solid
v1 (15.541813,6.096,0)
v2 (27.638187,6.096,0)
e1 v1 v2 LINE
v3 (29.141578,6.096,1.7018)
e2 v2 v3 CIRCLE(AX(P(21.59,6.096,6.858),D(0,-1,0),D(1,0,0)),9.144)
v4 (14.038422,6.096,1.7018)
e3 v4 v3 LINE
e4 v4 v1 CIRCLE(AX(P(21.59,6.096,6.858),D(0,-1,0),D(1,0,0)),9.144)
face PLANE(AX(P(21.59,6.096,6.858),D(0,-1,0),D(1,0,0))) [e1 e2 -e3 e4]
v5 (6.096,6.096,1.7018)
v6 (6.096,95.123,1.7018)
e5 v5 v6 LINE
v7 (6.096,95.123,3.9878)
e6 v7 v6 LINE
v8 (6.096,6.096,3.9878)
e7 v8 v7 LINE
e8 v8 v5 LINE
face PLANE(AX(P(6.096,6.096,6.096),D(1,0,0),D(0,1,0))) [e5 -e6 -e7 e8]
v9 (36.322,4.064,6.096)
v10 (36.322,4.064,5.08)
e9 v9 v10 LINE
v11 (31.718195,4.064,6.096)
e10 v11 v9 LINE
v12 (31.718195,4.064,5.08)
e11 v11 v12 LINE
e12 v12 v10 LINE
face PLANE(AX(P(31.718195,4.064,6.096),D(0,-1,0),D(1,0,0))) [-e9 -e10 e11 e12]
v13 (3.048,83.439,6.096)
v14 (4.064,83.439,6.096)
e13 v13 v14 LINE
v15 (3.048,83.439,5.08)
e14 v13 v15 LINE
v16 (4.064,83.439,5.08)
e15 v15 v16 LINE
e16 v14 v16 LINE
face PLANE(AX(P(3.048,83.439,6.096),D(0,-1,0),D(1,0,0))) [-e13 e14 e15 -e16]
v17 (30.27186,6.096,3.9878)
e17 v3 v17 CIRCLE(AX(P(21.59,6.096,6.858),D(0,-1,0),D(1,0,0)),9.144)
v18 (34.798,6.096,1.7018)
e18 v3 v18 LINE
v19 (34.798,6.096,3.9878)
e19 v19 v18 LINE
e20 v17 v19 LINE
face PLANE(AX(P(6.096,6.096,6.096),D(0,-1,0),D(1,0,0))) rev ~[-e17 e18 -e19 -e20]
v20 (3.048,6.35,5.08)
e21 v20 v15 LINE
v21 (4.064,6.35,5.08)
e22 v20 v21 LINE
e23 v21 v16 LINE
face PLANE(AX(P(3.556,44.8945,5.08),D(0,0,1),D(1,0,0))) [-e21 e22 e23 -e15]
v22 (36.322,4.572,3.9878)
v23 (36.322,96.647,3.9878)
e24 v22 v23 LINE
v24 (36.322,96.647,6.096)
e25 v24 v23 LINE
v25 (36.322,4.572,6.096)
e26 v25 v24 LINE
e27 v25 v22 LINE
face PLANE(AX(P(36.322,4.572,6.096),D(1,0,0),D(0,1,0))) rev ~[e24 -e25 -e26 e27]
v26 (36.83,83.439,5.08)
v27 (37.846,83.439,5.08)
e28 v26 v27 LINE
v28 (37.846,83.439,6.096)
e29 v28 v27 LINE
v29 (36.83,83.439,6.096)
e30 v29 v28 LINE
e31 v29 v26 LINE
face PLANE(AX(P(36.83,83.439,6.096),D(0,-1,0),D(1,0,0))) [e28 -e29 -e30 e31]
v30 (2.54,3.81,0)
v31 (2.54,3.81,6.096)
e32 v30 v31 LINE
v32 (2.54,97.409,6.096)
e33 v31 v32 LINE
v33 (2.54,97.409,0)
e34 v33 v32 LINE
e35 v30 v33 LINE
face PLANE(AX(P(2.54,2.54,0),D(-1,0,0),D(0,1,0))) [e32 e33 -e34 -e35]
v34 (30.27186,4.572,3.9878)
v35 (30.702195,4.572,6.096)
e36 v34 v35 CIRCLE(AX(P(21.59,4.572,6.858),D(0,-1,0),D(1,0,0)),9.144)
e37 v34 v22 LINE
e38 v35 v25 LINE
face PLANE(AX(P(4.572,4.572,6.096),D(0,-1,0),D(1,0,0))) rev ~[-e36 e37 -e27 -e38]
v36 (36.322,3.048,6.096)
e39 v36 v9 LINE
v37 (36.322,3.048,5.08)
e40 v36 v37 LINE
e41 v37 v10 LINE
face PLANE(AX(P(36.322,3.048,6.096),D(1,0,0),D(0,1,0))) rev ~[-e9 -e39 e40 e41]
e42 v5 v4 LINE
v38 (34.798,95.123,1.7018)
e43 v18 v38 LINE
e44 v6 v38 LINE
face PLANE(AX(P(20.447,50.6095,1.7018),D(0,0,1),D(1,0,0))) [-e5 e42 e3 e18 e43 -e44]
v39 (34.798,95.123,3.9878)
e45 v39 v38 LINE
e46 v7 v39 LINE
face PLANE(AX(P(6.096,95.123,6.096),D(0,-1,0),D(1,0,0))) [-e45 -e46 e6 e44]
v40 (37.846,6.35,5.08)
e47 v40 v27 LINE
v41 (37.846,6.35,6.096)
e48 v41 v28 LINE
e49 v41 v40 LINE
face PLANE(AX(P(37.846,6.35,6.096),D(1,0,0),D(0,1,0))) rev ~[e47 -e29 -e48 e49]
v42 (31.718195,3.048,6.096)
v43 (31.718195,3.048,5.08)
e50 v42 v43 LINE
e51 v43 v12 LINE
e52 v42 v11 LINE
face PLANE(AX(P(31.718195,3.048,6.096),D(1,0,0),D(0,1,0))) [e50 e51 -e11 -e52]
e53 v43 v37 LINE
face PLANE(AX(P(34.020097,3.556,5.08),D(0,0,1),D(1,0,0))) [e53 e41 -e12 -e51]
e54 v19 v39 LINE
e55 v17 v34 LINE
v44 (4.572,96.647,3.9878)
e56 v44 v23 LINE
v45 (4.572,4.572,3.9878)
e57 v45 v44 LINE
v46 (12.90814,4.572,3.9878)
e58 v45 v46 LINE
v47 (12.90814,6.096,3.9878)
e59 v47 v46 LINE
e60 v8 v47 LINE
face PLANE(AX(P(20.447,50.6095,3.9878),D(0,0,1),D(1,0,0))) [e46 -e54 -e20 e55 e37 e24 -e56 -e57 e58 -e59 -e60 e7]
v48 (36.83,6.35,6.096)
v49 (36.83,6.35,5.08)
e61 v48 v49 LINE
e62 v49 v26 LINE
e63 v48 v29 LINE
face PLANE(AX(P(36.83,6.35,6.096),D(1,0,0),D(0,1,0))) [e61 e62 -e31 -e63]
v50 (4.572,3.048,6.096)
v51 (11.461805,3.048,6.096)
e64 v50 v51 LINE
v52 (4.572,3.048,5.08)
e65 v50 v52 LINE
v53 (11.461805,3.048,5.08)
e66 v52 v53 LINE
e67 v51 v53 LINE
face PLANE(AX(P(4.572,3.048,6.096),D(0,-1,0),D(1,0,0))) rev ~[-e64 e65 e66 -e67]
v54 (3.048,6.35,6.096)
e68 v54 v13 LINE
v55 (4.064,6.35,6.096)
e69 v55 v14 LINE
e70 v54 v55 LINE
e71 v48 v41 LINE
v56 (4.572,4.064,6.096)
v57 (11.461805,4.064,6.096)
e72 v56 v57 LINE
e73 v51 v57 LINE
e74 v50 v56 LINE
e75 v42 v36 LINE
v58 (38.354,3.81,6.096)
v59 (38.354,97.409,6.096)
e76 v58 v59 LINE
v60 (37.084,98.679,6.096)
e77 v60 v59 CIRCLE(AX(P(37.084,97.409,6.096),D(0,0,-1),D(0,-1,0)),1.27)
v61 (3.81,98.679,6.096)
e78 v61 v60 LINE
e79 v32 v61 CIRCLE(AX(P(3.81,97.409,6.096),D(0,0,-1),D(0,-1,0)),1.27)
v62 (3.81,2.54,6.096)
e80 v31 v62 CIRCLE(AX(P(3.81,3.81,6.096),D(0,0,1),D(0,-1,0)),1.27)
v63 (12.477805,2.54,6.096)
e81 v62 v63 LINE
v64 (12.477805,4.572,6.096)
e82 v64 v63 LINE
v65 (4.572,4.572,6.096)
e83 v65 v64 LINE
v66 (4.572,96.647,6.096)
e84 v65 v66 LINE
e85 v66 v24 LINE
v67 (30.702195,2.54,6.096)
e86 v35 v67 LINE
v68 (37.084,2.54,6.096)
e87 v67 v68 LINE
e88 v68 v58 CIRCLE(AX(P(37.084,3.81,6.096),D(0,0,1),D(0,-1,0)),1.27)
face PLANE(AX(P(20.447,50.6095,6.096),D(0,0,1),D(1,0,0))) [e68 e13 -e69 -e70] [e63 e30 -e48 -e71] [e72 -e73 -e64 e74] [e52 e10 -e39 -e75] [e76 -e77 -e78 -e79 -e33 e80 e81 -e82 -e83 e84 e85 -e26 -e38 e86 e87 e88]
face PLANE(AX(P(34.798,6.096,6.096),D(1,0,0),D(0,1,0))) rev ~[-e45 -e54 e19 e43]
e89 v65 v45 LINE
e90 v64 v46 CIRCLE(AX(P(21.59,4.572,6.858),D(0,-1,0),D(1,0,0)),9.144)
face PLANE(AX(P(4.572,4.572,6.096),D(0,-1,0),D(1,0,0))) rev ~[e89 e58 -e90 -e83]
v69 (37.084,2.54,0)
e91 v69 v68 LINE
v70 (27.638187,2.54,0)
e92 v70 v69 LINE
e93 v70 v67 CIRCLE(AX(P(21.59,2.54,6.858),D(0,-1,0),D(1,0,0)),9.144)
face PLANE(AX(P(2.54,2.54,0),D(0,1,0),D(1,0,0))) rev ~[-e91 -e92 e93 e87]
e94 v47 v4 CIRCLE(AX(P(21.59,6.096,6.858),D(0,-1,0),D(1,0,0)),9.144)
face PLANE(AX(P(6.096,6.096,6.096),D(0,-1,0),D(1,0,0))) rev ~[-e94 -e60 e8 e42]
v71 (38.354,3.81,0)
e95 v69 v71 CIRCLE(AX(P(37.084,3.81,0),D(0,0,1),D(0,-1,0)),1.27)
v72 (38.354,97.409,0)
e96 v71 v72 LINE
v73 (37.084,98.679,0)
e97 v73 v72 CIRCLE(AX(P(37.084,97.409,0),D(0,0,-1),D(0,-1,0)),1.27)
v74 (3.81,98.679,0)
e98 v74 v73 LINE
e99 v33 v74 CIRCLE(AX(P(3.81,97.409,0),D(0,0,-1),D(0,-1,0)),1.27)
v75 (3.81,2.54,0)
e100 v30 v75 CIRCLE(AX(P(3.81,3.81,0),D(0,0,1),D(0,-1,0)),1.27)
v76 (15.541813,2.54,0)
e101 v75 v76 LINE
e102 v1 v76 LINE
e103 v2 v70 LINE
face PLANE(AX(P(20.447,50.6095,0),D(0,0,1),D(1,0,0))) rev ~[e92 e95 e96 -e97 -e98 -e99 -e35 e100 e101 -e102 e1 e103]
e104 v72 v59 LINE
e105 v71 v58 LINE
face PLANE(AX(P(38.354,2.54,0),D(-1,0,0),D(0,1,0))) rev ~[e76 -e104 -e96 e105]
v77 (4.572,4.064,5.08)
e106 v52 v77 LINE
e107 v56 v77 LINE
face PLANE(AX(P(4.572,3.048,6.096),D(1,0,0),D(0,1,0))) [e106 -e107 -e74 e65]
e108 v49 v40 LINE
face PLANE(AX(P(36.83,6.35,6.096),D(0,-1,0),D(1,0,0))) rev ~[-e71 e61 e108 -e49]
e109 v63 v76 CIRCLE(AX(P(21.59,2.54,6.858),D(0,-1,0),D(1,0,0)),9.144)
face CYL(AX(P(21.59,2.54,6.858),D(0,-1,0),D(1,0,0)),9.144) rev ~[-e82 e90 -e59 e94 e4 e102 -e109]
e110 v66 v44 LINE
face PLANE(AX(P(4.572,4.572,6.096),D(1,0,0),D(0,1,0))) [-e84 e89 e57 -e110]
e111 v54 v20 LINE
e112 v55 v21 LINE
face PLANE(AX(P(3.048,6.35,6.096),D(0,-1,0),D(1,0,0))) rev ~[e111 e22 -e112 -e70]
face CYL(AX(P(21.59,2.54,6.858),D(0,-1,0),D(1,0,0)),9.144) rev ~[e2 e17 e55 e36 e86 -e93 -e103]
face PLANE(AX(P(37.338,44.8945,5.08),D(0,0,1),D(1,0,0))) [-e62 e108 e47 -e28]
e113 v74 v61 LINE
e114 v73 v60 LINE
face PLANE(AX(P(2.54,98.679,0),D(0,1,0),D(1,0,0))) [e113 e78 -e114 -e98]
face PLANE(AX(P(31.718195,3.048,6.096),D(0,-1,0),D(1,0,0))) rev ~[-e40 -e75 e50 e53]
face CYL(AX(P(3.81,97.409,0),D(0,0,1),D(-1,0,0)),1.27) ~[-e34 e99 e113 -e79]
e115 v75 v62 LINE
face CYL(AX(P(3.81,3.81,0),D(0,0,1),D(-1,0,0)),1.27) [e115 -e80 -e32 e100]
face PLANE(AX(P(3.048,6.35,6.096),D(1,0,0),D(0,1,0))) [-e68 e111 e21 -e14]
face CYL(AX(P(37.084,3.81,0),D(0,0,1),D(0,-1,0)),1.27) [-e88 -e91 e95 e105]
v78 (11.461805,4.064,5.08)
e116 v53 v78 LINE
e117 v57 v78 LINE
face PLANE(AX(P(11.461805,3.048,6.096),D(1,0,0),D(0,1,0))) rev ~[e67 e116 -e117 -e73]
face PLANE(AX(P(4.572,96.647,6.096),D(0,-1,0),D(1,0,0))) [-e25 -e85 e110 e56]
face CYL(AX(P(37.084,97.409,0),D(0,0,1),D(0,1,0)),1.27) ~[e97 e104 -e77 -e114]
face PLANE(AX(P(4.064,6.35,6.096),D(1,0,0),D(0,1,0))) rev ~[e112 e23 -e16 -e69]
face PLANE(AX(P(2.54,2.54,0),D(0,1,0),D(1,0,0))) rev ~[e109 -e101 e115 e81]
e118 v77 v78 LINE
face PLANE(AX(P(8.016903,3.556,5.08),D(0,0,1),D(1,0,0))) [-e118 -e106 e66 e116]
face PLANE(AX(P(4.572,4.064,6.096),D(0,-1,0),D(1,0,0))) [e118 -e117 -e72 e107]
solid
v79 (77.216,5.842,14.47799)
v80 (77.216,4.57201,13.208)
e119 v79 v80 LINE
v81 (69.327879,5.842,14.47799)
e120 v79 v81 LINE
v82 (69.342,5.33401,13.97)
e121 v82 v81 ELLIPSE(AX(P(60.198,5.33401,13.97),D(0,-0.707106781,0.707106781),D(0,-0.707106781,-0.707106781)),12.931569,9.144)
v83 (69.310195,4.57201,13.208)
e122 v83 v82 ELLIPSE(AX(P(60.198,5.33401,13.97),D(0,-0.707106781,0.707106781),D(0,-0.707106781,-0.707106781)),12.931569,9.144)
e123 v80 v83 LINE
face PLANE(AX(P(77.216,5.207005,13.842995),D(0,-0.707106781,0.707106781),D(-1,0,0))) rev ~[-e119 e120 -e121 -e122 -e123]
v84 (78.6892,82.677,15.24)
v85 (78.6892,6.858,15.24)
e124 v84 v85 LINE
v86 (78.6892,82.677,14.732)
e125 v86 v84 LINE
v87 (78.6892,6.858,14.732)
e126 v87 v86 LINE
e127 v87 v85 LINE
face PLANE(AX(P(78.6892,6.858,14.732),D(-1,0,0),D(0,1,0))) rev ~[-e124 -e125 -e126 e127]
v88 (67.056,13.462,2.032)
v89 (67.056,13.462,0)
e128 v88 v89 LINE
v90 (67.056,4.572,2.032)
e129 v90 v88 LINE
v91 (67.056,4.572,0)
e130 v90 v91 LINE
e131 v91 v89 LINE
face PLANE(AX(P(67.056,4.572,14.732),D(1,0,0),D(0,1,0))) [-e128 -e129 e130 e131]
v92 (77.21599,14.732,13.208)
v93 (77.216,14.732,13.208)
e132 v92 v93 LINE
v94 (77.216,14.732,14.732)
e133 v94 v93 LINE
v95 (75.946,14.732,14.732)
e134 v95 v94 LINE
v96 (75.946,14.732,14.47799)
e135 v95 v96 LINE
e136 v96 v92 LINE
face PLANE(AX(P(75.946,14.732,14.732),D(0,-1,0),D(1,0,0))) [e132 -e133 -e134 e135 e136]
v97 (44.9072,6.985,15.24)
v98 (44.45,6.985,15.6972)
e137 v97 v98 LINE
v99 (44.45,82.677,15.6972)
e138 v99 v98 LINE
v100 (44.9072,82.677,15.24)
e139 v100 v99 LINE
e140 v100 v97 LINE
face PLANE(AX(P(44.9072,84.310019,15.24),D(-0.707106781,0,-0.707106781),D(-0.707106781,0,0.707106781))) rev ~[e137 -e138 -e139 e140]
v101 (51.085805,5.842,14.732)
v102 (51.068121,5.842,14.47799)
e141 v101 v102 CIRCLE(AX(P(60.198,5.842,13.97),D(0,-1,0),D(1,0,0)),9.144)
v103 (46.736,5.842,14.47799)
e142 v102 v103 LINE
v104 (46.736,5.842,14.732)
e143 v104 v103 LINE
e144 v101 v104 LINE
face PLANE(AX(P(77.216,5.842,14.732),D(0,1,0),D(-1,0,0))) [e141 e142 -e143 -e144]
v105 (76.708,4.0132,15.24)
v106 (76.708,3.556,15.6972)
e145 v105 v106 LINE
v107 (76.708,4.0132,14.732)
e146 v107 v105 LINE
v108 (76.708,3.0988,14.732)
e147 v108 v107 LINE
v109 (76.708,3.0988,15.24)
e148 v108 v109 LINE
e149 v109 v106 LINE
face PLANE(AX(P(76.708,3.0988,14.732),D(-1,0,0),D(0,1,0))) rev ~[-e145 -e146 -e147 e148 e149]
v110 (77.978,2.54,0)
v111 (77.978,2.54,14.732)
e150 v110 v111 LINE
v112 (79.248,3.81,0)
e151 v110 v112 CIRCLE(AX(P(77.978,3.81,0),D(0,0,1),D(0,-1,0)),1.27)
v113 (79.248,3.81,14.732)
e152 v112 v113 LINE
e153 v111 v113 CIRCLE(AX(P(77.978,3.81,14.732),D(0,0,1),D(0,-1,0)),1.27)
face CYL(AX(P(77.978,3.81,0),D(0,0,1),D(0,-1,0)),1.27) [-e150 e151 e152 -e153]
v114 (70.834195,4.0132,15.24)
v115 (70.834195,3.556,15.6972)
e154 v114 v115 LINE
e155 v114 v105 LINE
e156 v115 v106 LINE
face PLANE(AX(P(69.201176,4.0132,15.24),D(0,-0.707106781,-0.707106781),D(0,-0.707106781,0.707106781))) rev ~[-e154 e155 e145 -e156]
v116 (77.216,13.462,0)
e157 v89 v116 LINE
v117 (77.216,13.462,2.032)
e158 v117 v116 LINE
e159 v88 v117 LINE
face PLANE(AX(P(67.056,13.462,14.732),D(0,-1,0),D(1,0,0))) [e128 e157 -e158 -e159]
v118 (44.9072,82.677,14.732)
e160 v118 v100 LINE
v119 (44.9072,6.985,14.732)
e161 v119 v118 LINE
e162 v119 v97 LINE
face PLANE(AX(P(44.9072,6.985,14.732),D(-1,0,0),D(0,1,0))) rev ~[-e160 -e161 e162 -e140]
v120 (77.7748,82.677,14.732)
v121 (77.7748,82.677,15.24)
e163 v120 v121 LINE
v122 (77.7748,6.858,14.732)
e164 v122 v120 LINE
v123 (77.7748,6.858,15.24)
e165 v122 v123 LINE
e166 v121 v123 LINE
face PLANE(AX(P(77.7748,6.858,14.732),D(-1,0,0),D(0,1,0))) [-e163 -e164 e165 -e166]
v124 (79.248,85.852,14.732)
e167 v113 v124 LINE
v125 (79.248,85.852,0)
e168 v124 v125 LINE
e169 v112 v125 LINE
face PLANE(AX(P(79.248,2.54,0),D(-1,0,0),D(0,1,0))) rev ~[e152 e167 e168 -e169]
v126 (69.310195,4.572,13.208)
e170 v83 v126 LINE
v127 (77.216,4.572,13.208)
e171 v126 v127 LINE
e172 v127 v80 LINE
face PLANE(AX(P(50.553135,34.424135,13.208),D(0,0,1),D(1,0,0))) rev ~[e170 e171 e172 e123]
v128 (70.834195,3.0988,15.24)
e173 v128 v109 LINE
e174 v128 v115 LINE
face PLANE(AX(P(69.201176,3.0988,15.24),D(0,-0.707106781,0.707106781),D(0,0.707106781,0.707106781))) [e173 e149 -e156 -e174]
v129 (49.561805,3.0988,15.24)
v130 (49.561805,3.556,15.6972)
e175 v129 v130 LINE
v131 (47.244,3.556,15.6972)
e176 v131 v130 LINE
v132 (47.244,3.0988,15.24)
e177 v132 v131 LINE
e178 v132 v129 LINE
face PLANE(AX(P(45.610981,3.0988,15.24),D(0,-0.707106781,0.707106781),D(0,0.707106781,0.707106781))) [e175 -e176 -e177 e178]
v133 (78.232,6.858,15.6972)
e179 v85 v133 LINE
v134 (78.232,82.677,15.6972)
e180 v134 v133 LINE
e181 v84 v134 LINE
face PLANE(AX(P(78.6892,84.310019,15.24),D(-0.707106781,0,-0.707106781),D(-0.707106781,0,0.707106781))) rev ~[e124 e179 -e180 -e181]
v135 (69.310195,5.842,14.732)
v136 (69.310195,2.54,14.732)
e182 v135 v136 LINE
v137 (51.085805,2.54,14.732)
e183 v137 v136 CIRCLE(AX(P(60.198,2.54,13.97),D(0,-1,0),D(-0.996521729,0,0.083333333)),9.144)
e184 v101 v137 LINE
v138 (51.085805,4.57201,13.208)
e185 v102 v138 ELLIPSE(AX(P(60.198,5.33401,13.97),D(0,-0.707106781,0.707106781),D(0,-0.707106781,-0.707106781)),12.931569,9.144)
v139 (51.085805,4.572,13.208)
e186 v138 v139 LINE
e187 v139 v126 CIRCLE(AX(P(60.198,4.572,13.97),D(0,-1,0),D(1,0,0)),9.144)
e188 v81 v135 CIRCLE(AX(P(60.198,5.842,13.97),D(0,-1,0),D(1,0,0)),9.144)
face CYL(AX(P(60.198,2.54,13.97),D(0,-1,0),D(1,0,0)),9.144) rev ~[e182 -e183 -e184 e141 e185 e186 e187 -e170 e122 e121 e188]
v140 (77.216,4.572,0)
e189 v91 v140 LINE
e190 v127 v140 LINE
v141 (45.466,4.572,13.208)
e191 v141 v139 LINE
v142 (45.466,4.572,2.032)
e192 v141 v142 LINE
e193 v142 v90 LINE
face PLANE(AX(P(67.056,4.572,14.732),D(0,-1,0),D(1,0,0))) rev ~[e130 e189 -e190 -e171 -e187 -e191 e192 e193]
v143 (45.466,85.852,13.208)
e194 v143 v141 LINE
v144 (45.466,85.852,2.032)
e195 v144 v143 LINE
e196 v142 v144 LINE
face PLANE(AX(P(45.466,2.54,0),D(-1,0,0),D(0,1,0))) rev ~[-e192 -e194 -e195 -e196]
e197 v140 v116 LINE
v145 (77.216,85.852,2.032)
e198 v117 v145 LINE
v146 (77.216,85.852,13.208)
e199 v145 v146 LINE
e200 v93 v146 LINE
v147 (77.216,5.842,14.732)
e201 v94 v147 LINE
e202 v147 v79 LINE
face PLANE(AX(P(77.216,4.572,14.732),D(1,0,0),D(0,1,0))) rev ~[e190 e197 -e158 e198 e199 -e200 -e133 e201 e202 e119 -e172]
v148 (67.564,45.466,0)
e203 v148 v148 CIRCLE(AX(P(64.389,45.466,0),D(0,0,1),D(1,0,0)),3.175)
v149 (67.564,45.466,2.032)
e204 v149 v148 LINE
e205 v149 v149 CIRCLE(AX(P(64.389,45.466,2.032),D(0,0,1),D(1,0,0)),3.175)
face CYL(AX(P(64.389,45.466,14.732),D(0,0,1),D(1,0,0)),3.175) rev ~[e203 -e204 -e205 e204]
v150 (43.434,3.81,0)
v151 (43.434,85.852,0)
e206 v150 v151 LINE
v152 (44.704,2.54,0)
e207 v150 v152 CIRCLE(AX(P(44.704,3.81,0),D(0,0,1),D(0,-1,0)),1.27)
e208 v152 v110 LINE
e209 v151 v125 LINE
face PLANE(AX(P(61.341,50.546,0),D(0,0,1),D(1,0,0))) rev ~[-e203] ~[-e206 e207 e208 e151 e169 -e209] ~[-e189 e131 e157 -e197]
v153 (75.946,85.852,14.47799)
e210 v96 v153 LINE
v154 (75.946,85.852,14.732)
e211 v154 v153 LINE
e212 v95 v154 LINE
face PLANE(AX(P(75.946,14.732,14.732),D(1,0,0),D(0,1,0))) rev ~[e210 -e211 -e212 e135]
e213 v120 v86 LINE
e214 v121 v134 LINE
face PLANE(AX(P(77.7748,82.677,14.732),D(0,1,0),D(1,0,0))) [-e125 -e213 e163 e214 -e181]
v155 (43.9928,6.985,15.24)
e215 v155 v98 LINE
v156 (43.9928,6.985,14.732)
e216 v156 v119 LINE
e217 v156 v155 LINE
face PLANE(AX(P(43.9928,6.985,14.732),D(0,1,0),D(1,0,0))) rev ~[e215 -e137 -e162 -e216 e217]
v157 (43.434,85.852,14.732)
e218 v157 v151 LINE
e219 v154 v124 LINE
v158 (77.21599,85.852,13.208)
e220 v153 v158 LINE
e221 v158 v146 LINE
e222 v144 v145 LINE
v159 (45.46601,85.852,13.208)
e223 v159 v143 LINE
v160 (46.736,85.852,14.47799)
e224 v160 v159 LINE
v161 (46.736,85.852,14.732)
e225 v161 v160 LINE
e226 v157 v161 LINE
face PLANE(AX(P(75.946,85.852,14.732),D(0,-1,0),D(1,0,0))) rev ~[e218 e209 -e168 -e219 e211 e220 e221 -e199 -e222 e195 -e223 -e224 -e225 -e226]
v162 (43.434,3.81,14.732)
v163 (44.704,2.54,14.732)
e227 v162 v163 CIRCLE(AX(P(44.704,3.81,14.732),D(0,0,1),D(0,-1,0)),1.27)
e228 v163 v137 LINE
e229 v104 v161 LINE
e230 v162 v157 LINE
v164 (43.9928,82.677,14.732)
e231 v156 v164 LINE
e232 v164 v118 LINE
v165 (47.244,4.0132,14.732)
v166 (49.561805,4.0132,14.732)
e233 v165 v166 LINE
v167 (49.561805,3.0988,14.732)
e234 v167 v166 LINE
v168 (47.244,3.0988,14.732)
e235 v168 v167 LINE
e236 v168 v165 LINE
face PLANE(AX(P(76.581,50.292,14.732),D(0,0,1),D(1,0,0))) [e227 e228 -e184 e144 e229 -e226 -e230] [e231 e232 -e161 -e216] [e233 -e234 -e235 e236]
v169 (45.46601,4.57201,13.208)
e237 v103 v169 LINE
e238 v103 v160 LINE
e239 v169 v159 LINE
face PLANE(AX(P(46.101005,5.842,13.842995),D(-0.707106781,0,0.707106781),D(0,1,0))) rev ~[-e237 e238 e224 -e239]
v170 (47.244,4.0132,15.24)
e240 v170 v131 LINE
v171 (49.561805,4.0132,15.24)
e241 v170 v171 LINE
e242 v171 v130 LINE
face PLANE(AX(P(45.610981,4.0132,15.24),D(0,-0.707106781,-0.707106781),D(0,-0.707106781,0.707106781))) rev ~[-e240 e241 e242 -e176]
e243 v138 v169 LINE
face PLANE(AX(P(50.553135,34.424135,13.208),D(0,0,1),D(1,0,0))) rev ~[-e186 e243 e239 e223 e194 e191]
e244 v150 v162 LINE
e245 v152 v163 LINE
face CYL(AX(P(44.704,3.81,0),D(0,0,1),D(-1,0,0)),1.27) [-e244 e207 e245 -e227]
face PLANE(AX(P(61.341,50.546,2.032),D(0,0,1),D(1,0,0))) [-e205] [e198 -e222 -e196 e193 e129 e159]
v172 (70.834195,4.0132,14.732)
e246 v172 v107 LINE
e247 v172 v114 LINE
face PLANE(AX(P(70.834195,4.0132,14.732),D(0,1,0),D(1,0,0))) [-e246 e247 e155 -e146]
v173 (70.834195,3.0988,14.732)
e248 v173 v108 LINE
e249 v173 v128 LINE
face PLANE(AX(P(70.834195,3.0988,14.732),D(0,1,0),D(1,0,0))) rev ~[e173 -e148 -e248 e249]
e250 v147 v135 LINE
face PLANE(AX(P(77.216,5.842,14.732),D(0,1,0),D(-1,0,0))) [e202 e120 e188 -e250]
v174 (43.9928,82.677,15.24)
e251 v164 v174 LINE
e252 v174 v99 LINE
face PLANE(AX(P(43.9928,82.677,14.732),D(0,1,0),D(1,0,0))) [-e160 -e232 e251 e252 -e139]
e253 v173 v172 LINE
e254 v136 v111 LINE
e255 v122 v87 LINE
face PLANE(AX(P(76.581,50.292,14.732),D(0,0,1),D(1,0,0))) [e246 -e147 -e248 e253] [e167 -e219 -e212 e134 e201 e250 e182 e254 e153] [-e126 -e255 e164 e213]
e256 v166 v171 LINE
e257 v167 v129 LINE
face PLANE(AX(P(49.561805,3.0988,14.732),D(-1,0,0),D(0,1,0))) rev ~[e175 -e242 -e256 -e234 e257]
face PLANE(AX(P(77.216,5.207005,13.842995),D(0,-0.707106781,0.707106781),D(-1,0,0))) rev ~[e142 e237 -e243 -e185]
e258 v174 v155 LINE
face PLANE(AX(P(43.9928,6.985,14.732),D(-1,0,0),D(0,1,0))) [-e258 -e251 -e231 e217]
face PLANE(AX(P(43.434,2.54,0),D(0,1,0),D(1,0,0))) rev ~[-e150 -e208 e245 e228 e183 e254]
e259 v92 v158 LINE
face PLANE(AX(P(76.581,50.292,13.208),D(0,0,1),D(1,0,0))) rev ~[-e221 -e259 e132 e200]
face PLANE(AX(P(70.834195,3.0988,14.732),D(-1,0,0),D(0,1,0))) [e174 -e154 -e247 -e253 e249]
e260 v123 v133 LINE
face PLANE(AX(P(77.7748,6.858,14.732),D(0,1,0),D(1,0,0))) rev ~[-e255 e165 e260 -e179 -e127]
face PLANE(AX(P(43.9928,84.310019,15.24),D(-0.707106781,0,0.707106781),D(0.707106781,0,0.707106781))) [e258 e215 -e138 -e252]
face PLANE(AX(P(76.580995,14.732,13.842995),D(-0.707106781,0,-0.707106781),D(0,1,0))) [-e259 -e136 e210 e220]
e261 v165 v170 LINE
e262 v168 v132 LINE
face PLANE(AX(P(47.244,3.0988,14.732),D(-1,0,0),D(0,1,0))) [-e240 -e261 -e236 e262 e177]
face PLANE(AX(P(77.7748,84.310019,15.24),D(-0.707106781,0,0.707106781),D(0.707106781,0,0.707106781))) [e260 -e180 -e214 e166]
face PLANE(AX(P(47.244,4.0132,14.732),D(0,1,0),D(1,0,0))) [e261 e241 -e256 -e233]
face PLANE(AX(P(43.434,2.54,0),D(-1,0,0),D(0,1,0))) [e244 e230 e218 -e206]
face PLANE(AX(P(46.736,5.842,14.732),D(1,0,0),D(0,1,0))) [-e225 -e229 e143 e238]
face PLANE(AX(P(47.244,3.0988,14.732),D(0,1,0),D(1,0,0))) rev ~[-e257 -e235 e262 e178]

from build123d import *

# Parameters (mm, degrees)
F0_W         = 35.814
F0_H         = 96.139
F1_DEPTH     = 6.096
F2_W         = 28.702
F2_H         = 89.027
F3_DEPTH     = 4.3942
F4_W         = 31.75
F4_H         = 92.075
F4_W_2       = 28.702
F4_H_2       = 89.027
F5_DEPTH     = 2.1082
F6_W         = 35.814
F6_H         = 96.012
F7_DEPTH     = 14.732
F8_T         = -2.032
F9_W         = 35.814
F9_H         = 12.7
F9_W_2       = 10.16
F9_H_2       = 8.89
F9_R         = 3.175
F10_DEPTH    = 14.733
F11_W        = 1.27
F11_H        = 71.12
F12_DEPTH    = 1.524
F13_SIZE     = 1.26999
F14_R        = 1.27
F14_2_R      = 1.27
F15_R        = 9.144
F16_DEPTH    = 96.14
F17_DEPTH    = 3.556
F18_W        = 6.8898053138
F18_H        = 1.016
F18_W_2      = 1.016
F18_H_2      = 77.089
F18_W_3      = 4.6038053138
F19_DEPTH    = 1.016
F20_W        = 2.3178053138
F20_H        = 0.9144
F20_W_2      = 0.9144
F20_H_2      = 75.692
F20_W_3      = 5.8738053138
F20_H_3      = 75.819
F21_DEPTH    = 1.143
F22_T1_DEPTH = 5.5838427085
F22_T3_DEPTH = 78.9580373947
F22_T5_DEPTH = 9.1398427085
F22_T7_DEPTH = 79.0850373947


# Not quite as in the source:
# - a fillet or chamfer that OpenCascade refuses, or shapes differently, is made with other operations: its cross-section is extruded or revolved along the edge and cut away or added
# - a fillet or chamfer is up to 0.001 mm smaller than in the source, because OpenCascade refuses the exact size
# - a feature names something its author has since deleted; it is built from what else it names


with BuildPart() as f1:
    # F0 (on Top) → F1 (new body)
    with BuildSketch(Plane.XY):
        with Locations((20.447, 50.6095)):
            Rectangle(F0_W, F0_H)
    extrude(amount=F1_DEPTH)

    # F2 (on face) → F3 (cut)
    with BuildSketch(Plane.XY.offset(6.096)):
        with Locations((20.447, 50.6095)):
            Rectangle(F2_W, F2_H)
    extrude(amount=-F3_DEPTH, mode=Mode.SUBTRACT)

    # F4 (on face) → F5 (cut)
    with BuildSketch(Plane.XY.offset(6.096)):
        with Locations((20.447, 50.6095)):
            Rectangle(F4_W, F4_H)
        with Locations((20.447, 50.6095)):
            Rectangle(F4_W_2, F4_H_2, mode=Mode.SUBTRACT)
    extrude(amount=-F5_DEPTH, mode=Mode.SUBTRACT)

    # F14
    f14_edges = [f1.edges().sort_by_distance(p)[0] for p in [
        (38.354, 2.54, 3.048),
        (38.354, 98.679, 3.048),
        (2.54, 2.54, 3.048),
        (2.54, 98.679, 3.048),
    ]]
    fillet(f14_edges, radius=F14_R)

    # F15 (on face) → F17 (cut)
    with BuildSketch(Plane.XZ.offset(-2.54)):
        with Locations((60.198, 13.97)):
            Circle(F15_R)
        with Locations((21.59, 6.858)):
            Circle(F15_R)
    extrude(amount=-F17_DEPTH, mode=Mode.SUBTRACT)

    # F18 (on face) → F19 (cut)
    with BuildSketch(Plane.XY.offset(6.096)):
        with Locations((8.0169026569, 3.556)):
            Rectangle(F18_W, F18_H)
        with Locations((3.556, 44.8945)):
            Rectangle(F18_W_2, F18_H_2)
        with Locations((37.338, 44.8945)):
            Rectangle(F18_W_2, F18_H_2)
        with Locations((34.0200973431, 3.556)):
            Rectangle(F18_W_3, F18_H)
    extrude(amount=-F19_DEPTH, mode=Mode.SUBTRACT)


with BuildPart() as f7:
    # F6 (on Top) → F7 (new body)
    with BuildSketch(Plane.XY):
        with Locations((61.341, 50.546)):
            Rectangle(F6_W, F6_H)
    extrude(amount=F7_DEPTH)

    # F8
    f8_openings = [f7.faces().sort_by_distance(p)[0] for p in [
        (61.341, 50.546, 14.732),
    ]]
    offset(amount=F8_T, openings=f8_openings)

    # F9 (on face) → F10 (cut, through all)
    with BuildSketch(Plane.XY.offset(14.732)):
        with Locations((61.341, 92.202)):
            Rectangle(F9_W, F9_H)
        with Locations((72.136, 9.017)):
            Rectangle(F9_W_2, F9_H_2)
        with Locations((64.389, 45.466)):
            Circle(F9_R)
    extrude(amount=-F10_DEPTH, mode=Mode.SUBTRACT)

    # F11 (on face) → F12 (join)
    with BuildSketch(Plane.XY.offset(14.732)):
        with Locations((76.581, 50.292)):
            Rectangle(F11_W, F11_H)
        Polygon((45.466, 85.852), (45.466, 4.572), (77.216, 4.572), (77.216, 5.842), (46.736, 5.842), (46.736, 85.852), align=None)
    extrude(amount=-F12_DEPTH)

    # F13 (size 1.27 in the source; OpenCascade refuses exactly that, so slightly less here)
    f13_edges = [f7.edges().sort_by_distance(p)[0] for p in [
        (61.976, 5.842, 13.208),
        (75.946, 50.292, 13.208),
        (46.736, 45.847, 13.208),
    ]]
    chamfer(f13_edges, length=F13_SIZE)

    # F14#2
    f14_2_edges = [f7.edges().sort_by_distance(p)[0] for p in [
        (79.248, 2.54, 7.366),
        (43.434, 2.54, 7.366),
    ]]
    fillet(f14_2_edges, radius=F14_2_R)

    # F15 (on face) → F16 (cut, through all)
    with BuildSketch(Plane.XZ.offset(-2.54)):
        with Locations((60.198, 13.97)):
            Circle(F15_R)
        with Locations((21.59, 6.858)):
            Circle(F15_R)
    extrude(amount=-F16_DEPTH, mode=Mode.SUBTRACT)

    # F20 (on face) → F21 (join)
    with BuildSketch(Plane.XY.offset(14.732)):
        with Locations((48.4029026569, 3.556)):
            Rectangle(F20_W, F20_H)
        with Locations((44.45, 44.831)):
            Rectangle(F20_W_2, F20_H_2)
        with Locations((73.7710973431, 3.556)):
            Rectangle(F20_W_3, F20_H)
        with Locations((78.232, 44.7675)):
            Rectangle(F20_W_2, F20_H_3)
    extrude(amount=F21_DEPTH)

    # F22: chamfer of 0.635 on 8 edges, made by hand

    # F22_s2 → F22_t1 (cut)
    with BuildSketch(Plane.YZ.offset(45.6109813026)):
        Polygon((3.0988, 15.24), (3.7338, 15.875), (3.0988, 15.875), align=None)
        Polygon((4.0132, 15.24), (3.3782, 15.875), (4.0132, 15.875), align=None)
    extrude(amount=F22_T1_DEPTH, mode=Mode.SUBTRACT)

    # F22_s4 → F22_t3 (cut)
    with BuildSketch(Plane.XZ.offset(-84.3100186974)):
        Polygon((44.9072, 15.24), (44.2722, 15.875), (44.9072, 15.875), align=None)
        Polygon((43.9928, 15.24), (44.6278, 15.875), (43.9928, 15.875), align=None)
    extrude(amount=F22_T3_DEPTH, mode=Mode.SUBTRACT)

    # F22_s6 → F22_t5 (cut)
    with BuildSketch(Plane.YZ.offset(69.2011759889)):
        Polygon((3.0988, 15.24), (3.7338, 15.875), (3.0988, 15.875), align=None)
        Polygon((4.0132, 15.24), (3.3782, 15.875), (4.0132, 15.875), align=None)
    extrude(amount=F22_T5_DEPTH, mode=Mode.SUBTRACT)

    # F22_s8 → F22_t7 (cut)
    with BuildSketch(Plane.XZ.offset(-84.3100186974)):
        Polygon((78.6892, 15.24), (78.0542, 15.875), (78.6892, 15.875), align=None)
        Polygon((77.7748, 15.24), (78.4098, 15.875), (77.7748, 15.875), align=None)
    extrude(amount=F22_T7_DEPTH, mode=Mode.SUBTRACT)


solid = Compound([f1.part, f7.part])
